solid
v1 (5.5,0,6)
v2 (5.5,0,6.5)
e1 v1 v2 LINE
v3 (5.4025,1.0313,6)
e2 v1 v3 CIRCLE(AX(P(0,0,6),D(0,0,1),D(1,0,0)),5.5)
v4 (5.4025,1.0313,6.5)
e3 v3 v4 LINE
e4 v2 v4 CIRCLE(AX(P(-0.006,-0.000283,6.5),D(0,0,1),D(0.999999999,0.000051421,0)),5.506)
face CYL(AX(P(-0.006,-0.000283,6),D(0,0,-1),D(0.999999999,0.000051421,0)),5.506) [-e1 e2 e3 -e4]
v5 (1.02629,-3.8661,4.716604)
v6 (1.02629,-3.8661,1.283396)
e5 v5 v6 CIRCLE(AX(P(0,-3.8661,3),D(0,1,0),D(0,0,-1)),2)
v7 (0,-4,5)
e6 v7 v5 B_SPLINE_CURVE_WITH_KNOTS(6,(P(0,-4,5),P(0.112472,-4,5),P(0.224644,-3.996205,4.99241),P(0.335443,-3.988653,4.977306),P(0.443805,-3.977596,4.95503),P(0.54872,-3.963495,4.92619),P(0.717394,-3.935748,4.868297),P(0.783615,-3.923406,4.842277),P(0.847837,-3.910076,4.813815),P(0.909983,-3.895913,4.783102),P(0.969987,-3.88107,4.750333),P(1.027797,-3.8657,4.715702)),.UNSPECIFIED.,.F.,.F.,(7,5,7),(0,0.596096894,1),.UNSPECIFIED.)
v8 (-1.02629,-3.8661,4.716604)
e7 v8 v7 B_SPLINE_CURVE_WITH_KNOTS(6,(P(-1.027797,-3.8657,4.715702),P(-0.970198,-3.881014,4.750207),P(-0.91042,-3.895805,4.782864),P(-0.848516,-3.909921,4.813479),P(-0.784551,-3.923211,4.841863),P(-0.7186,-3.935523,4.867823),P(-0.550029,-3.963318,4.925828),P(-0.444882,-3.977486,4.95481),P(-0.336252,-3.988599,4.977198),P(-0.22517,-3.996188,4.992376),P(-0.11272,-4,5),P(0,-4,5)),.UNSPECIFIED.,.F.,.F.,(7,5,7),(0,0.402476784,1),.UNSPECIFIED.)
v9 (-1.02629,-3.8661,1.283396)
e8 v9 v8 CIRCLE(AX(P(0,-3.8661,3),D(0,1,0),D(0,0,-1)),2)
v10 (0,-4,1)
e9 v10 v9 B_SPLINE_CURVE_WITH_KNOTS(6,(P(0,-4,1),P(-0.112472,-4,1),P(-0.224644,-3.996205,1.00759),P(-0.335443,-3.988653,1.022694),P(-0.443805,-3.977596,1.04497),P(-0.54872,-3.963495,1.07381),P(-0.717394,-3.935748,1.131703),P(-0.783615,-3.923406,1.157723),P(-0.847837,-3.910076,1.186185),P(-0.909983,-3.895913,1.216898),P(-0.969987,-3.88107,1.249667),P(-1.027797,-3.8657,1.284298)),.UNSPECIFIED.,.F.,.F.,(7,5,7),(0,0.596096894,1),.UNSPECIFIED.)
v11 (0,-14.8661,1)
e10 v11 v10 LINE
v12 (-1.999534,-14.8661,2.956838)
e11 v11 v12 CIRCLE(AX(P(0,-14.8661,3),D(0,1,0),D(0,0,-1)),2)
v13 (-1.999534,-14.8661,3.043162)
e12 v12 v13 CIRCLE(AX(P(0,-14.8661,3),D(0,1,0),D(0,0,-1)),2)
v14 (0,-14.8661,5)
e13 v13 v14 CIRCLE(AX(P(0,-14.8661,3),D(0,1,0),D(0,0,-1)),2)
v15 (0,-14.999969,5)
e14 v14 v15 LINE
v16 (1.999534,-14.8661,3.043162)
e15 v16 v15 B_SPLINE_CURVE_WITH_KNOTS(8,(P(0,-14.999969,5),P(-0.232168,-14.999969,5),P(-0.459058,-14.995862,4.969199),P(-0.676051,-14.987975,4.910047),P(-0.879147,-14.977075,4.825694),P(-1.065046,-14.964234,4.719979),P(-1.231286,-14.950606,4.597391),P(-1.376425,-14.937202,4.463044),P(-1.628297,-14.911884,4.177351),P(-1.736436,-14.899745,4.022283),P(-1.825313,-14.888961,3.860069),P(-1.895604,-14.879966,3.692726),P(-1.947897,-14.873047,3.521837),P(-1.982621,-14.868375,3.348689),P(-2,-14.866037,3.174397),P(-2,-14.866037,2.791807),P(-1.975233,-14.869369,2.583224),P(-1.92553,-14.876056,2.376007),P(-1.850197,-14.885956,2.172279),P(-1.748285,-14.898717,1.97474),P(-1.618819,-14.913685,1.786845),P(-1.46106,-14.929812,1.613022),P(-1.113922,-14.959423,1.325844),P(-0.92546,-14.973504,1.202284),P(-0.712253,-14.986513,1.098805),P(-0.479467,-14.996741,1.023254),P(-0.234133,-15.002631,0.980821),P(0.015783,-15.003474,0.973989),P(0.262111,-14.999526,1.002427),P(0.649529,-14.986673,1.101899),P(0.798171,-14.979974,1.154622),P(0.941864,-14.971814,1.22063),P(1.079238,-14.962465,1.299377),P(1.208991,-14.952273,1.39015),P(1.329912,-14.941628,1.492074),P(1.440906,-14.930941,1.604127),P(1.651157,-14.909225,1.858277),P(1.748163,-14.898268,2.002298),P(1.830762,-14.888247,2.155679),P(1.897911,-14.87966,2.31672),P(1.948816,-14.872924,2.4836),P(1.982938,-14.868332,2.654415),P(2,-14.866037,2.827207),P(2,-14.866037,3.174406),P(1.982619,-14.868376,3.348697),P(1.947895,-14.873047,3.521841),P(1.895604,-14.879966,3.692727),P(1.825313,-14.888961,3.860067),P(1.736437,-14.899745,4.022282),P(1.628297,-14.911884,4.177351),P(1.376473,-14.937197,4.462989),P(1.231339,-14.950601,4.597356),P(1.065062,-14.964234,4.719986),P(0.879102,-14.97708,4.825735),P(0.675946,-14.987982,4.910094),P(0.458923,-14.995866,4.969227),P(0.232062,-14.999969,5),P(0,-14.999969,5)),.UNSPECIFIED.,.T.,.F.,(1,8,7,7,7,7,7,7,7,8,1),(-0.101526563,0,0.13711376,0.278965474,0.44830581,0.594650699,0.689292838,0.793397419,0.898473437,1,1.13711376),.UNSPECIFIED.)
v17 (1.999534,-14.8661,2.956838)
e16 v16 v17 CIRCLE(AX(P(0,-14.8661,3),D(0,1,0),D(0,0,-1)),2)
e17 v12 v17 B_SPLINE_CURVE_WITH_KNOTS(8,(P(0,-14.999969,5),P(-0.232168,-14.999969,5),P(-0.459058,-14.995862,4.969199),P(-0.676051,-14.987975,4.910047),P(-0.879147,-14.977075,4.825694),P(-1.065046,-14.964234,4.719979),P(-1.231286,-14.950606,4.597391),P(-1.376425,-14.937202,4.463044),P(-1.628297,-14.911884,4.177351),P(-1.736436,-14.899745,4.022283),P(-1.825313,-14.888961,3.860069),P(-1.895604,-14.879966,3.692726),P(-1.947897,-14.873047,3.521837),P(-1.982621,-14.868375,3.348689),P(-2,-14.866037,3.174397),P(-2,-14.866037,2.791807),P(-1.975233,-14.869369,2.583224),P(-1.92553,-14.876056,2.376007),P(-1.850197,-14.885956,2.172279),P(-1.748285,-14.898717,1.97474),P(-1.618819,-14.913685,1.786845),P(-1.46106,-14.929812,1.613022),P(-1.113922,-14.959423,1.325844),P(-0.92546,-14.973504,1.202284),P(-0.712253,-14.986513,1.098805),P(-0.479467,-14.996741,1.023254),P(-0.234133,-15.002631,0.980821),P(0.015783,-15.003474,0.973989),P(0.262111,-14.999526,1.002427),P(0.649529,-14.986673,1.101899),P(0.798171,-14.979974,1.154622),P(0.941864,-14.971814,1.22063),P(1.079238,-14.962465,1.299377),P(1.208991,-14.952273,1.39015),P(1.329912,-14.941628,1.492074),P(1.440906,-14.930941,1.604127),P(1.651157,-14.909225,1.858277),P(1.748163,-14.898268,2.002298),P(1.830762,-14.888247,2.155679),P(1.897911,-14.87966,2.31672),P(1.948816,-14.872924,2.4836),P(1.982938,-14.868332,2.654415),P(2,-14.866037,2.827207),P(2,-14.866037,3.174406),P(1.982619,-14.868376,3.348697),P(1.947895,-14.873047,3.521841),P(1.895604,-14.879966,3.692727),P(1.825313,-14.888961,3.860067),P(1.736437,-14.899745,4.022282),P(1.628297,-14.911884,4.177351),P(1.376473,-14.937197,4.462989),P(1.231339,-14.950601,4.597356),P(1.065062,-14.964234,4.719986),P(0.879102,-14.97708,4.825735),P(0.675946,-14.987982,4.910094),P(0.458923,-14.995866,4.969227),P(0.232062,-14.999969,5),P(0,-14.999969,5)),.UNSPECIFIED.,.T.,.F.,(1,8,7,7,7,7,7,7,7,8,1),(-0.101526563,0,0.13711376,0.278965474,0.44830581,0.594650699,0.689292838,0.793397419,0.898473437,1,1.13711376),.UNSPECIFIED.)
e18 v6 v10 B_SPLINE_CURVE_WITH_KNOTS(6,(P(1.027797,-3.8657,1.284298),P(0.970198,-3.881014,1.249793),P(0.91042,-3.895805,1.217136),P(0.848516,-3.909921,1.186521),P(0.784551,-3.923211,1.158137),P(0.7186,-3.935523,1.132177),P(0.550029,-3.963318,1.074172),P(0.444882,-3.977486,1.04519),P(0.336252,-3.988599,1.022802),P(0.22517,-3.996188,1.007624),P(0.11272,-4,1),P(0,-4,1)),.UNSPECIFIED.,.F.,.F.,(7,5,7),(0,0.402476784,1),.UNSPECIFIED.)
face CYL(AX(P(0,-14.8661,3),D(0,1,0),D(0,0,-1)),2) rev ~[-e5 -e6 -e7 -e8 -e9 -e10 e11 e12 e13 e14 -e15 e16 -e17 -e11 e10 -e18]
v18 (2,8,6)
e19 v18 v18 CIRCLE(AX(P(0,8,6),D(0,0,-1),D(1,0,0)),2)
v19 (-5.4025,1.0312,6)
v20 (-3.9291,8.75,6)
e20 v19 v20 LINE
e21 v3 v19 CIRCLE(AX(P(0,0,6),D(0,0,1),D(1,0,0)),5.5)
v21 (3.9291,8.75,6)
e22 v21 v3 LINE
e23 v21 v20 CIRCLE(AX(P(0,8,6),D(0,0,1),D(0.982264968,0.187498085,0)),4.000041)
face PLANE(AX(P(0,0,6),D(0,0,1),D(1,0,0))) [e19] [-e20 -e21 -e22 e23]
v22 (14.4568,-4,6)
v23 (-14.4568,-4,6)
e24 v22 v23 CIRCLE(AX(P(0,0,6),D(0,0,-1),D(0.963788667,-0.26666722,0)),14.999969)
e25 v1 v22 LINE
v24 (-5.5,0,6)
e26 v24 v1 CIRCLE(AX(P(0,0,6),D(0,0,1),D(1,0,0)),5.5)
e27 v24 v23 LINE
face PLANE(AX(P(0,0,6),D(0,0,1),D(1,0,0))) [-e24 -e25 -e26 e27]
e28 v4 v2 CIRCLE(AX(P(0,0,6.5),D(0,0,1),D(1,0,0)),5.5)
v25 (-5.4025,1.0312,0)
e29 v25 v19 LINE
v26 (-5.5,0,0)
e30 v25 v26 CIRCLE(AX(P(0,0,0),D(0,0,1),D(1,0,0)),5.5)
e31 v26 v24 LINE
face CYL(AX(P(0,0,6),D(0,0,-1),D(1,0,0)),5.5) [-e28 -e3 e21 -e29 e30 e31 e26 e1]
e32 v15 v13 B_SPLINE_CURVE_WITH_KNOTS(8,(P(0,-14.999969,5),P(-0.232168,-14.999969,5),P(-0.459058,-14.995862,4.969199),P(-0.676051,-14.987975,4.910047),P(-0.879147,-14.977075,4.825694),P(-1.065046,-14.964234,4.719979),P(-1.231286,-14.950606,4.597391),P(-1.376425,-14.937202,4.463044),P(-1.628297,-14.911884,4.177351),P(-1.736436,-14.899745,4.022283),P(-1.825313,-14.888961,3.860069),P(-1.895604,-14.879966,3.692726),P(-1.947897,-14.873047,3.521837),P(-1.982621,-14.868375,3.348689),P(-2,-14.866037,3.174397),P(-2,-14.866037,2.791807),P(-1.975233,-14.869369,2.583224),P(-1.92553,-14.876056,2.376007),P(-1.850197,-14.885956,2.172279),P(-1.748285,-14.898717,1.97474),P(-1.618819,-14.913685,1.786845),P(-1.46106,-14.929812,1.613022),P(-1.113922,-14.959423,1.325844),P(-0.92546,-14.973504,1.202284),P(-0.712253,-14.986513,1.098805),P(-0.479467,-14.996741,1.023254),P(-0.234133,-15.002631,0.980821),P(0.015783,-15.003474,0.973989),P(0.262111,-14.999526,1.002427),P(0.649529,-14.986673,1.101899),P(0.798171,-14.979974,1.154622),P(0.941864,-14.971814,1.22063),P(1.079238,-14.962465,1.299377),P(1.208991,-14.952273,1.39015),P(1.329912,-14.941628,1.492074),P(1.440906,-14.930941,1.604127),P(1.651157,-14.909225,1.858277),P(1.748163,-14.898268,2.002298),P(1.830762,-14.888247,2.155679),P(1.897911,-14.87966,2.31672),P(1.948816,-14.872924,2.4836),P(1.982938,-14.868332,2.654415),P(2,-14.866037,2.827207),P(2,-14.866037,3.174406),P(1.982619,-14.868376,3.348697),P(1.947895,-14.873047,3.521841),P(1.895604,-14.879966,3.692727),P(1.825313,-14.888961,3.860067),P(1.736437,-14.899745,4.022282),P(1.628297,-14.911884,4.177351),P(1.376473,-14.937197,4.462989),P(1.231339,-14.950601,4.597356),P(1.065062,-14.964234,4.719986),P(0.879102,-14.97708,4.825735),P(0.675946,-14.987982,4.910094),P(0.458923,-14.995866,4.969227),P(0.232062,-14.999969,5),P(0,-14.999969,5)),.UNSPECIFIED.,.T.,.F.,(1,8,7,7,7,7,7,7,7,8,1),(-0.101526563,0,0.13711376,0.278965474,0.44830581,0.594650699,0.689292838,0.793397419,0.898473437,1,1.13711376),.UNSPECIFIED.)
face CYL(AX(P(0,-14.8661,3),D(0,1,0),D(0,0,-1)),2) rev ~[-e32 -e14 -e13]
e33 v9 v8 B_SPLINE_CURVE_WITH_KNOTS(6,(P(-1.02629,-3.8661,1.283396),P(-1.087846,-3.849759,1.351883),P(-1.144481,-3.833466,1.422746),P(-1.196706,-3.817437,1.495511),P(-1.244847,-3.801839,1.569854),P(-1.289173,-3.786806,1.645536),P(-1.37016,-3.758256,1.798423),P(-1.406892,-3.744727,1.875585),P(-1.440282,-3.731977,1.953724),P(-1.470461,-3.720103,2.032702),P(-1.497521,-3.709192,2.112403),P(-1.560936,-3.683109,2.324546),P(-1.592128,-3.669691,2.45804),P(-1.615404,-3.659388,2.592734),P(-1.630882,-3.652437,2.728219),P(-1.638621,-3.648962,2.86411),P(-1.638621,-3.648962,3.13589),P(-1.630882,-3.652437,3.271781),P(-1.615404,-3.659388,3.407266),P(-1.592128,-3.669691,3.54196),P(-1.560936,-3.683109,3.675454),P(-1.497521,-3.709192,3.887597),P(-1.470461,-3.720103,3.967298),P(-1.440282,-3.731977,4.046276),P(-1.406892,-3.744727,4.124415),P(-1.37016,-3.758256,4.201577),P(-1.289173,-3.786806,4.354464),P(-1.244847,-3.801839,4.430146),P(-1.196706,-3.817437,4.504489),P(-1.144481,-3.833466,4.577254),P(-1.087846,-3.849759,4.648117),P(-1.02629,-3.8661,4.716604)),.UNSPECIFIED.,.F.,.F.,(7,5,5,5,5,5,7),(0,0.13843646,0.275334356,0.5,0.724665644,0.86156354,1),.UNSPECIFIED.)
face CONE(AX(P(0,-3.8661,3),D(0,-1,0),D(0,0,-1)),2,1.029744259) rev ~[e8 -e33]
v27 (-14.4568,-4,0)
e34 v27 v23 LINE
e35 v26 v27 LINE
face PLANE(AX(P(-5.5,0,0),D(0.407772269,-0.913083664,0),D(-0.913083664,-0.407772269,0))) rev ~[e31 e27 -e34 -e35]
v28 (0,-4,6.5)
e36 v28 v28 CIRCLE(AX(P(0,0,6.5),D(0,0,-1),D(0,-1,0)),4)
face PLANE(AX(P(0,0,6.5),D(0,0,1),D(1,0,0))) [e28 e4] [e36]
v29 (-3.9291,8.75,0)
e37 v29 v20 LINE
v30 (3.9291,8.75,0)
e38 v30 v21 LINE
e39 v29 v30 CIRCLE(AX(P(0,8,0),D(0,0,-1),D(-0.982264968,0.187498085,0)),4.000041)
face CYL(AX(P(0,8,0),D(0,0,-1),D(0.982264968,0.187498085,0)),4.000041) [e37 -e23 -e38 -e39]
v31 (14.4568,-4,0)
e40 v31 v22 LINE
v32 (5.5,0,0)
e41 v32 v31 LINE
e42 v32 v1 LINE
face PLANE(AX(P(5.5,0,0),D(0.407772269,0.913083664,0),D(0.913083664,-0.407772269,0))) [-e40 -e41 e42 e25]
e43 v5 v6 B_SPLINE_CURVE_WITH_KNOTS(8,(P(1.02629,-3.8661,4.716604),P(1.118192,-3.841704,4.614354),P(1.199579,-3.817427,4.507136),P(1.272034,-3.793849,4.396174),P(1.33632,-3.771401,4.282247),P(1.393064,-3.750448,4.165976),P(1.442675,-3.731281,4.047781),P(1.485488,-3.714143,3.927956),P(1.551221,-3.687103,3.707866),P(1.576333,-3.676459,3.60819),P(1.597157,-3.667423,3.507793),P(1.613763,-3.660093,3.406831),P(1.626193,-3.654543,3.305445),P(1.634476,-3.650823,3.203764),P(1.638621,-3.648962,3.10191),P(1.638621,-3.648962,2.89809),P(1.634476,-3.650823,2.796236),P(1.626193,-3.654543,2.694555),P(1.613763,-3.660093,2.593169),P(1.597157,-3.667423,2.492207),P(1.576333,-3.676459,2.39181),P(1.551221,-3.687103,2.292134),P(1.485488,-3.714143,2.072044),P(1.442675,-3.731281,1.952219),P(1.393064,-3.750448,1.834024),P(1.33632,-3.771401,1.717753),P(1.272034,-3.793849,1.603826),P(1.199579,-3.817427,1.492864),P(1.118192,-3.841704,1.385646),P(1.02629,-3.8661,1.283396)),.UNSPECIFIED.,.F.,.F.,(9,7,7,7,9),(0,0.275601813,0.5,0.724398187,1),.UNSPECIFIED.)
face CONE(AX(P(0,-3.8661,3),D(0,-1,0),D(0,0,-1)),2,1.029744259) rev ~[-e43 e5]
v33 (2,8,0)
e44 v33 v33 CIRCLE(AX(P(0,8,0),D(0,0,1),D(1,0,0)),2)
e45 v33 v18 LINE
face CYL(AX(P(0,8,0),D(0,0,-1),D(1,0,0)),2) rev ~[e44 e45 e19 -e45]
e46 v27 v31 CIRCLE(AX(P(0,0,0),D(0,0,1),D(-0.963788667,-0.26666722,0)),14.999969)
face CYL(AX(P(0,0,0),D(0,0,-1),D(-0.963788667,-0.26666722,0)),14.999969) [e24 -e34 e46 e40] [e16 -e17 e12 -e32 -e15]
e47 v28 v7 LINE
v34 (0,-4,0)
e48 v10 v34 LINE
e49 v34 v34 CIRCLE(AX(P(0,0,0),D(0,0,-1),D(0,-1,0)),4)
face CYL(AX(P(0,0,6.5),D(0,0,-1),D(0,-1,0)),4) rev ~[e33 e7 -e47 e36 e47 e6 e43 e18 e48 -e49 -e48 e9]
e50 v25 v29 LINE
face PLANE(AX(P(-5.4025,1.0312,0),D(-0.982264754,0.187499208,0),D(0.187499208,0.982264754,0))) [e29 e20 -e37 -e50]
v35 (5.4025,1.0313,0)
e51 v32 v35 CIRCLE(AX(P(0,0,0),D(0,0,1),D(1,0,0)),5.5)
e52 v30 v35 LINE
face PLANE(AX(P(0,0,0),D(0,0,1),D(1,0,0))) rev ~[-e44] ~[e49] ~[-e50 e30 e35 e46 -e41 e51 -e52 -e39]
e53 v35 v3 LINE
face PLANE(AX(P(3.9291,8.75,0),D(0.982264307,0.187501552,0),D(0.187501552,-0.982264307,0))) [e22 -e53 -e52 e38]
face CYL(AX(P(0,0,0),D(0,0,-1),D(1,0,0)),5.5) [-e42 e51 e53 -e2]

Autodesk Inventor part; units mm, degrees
ref_plane "YZ Plane" through (0, 0, 0) normal (1, 0, 0) x (0, 1, 0)
ref_plane "XZ Plane" through (0, 0, 0) normal (0, 1, 0) x (-1, 0, 0)
sketch "Sketch1" plane through (0, 0, 0) normal (0, 0, 1) x (1, 0, 0)
  arc A0 (-14.4568, -4) -> (14.4568, -4) centre (0, 0) ccw
  circle A1 centre (0, 0) radius 5.5
  line L0 (0, 0) -> (0, -4)
  line L1 (-5.5, 0) -> (-14.4568, -4)
  line L2 (5.5, 0) -> (14.4568, -4)
  line L3 (0, 0) -> (0, 8)
  circle A2 centre (0, 8) radius 2
  line L4 (-5.4025, 1.0312) -> (-3.9291, 8.75)
  line L5 (3.9291, 8.75) -> (5.4025, 1.0313)
  arc A3 (3.9291, 8.75) -> (-3.9291, 8.75) centre (0, 8) ccw
  line L6 (-2, 14.8661) -> (2, 14.8661)
  line L7 (2, 14.8661) -> (2, -14.8661)
  line L8 (2, -14.8661) -> (-2, -14.8661)
  line L9 (-2, -14.8661) -> (-2, 14.8661)
  line L10 (-2, 14.8661) -> (2, -14.8661) construction
  line L11 (2, 14.8661) -> (-2, -14.8661) construction
  dimension "d0" = 30
  dimension "d1" = 11
  dimension "d2" = 4
  dimension "d3" = 8
  dimension "d4" = 4
extrude "Extrusion1" add sketch "Sketch1" along normal blind 6 contours L1 A1 L9 A0 | L8 A0 | L9 A1 L7 L8 | A1 L9 | L7 A1 L2 A0 | L9 A1 L7 | L4 A3 L9 A1 | L7 A1 | L9 A2 L3 A1 | L7 A3 L5 A1 | A1 L3 A2 L7 | L9 A3 L7 A2
sketch "Sketch2" plane through (0, 0, 6) normal (0, 0, 1) x (1, 0, 0)
  arc A0 (5.5, 0) -> (5.4025, 1.0313) centre (0, 0) ccw projected
  circle A1 centre (0, 0) radius 5.5
  point P0 (5.4025, 1.0313)
extrude "Extrusion2" add sketch "Sketch2" along normal blind 0.5
sketch "Sketch3" plane through (0, 0, 6.5) normal (0, 0, 1) x (1, 0, 0)
  point P0 (0, 0)
hole "Hole2" at (0, 0, 6.5) direction (0, 0, -1) diameter 8 end through all
sketch "Sketch4" plane through (0, 0, 6) normal (0, 0, 1) x (1, 0, 0)
  point P0 (0, 0)
ref_plane "Work Plane1" through (-2, -14.8661, 0) normal (0, 1, 0) x (1, 0, 0)
sketch "Sketch5" plane through (-2, -14.8661, 0) normal (0, 1, 0) x (1, 0, 0)
  line L0 (4, -6) -> (0, -6) projected
  line L1 (2, -6) -> (2, -3)
  point P0 (2, 0)
  dimension "d26" = 3
hole "Hole3" at (0, -14.8661, 3) direction (0, 1, 0) diameter 4 depth 11 tip angle 118
sketch "Sketch6" plane through (-2, -14.8661, 0) normal (0, 1, 0) x (1, 0, 0)
  arc A0 (4, -3) -> (0, -3) centre (2, -3) ccw projected
  circle A1 centre (2, -3) radius 2
  point P0 (2, 0)
hole "Hole4" at (0, -14.8661, 3) direction (0, -1, 0) diameter 4 depth 11 tip angle 118
properties part number "KURBEL PART 8"
